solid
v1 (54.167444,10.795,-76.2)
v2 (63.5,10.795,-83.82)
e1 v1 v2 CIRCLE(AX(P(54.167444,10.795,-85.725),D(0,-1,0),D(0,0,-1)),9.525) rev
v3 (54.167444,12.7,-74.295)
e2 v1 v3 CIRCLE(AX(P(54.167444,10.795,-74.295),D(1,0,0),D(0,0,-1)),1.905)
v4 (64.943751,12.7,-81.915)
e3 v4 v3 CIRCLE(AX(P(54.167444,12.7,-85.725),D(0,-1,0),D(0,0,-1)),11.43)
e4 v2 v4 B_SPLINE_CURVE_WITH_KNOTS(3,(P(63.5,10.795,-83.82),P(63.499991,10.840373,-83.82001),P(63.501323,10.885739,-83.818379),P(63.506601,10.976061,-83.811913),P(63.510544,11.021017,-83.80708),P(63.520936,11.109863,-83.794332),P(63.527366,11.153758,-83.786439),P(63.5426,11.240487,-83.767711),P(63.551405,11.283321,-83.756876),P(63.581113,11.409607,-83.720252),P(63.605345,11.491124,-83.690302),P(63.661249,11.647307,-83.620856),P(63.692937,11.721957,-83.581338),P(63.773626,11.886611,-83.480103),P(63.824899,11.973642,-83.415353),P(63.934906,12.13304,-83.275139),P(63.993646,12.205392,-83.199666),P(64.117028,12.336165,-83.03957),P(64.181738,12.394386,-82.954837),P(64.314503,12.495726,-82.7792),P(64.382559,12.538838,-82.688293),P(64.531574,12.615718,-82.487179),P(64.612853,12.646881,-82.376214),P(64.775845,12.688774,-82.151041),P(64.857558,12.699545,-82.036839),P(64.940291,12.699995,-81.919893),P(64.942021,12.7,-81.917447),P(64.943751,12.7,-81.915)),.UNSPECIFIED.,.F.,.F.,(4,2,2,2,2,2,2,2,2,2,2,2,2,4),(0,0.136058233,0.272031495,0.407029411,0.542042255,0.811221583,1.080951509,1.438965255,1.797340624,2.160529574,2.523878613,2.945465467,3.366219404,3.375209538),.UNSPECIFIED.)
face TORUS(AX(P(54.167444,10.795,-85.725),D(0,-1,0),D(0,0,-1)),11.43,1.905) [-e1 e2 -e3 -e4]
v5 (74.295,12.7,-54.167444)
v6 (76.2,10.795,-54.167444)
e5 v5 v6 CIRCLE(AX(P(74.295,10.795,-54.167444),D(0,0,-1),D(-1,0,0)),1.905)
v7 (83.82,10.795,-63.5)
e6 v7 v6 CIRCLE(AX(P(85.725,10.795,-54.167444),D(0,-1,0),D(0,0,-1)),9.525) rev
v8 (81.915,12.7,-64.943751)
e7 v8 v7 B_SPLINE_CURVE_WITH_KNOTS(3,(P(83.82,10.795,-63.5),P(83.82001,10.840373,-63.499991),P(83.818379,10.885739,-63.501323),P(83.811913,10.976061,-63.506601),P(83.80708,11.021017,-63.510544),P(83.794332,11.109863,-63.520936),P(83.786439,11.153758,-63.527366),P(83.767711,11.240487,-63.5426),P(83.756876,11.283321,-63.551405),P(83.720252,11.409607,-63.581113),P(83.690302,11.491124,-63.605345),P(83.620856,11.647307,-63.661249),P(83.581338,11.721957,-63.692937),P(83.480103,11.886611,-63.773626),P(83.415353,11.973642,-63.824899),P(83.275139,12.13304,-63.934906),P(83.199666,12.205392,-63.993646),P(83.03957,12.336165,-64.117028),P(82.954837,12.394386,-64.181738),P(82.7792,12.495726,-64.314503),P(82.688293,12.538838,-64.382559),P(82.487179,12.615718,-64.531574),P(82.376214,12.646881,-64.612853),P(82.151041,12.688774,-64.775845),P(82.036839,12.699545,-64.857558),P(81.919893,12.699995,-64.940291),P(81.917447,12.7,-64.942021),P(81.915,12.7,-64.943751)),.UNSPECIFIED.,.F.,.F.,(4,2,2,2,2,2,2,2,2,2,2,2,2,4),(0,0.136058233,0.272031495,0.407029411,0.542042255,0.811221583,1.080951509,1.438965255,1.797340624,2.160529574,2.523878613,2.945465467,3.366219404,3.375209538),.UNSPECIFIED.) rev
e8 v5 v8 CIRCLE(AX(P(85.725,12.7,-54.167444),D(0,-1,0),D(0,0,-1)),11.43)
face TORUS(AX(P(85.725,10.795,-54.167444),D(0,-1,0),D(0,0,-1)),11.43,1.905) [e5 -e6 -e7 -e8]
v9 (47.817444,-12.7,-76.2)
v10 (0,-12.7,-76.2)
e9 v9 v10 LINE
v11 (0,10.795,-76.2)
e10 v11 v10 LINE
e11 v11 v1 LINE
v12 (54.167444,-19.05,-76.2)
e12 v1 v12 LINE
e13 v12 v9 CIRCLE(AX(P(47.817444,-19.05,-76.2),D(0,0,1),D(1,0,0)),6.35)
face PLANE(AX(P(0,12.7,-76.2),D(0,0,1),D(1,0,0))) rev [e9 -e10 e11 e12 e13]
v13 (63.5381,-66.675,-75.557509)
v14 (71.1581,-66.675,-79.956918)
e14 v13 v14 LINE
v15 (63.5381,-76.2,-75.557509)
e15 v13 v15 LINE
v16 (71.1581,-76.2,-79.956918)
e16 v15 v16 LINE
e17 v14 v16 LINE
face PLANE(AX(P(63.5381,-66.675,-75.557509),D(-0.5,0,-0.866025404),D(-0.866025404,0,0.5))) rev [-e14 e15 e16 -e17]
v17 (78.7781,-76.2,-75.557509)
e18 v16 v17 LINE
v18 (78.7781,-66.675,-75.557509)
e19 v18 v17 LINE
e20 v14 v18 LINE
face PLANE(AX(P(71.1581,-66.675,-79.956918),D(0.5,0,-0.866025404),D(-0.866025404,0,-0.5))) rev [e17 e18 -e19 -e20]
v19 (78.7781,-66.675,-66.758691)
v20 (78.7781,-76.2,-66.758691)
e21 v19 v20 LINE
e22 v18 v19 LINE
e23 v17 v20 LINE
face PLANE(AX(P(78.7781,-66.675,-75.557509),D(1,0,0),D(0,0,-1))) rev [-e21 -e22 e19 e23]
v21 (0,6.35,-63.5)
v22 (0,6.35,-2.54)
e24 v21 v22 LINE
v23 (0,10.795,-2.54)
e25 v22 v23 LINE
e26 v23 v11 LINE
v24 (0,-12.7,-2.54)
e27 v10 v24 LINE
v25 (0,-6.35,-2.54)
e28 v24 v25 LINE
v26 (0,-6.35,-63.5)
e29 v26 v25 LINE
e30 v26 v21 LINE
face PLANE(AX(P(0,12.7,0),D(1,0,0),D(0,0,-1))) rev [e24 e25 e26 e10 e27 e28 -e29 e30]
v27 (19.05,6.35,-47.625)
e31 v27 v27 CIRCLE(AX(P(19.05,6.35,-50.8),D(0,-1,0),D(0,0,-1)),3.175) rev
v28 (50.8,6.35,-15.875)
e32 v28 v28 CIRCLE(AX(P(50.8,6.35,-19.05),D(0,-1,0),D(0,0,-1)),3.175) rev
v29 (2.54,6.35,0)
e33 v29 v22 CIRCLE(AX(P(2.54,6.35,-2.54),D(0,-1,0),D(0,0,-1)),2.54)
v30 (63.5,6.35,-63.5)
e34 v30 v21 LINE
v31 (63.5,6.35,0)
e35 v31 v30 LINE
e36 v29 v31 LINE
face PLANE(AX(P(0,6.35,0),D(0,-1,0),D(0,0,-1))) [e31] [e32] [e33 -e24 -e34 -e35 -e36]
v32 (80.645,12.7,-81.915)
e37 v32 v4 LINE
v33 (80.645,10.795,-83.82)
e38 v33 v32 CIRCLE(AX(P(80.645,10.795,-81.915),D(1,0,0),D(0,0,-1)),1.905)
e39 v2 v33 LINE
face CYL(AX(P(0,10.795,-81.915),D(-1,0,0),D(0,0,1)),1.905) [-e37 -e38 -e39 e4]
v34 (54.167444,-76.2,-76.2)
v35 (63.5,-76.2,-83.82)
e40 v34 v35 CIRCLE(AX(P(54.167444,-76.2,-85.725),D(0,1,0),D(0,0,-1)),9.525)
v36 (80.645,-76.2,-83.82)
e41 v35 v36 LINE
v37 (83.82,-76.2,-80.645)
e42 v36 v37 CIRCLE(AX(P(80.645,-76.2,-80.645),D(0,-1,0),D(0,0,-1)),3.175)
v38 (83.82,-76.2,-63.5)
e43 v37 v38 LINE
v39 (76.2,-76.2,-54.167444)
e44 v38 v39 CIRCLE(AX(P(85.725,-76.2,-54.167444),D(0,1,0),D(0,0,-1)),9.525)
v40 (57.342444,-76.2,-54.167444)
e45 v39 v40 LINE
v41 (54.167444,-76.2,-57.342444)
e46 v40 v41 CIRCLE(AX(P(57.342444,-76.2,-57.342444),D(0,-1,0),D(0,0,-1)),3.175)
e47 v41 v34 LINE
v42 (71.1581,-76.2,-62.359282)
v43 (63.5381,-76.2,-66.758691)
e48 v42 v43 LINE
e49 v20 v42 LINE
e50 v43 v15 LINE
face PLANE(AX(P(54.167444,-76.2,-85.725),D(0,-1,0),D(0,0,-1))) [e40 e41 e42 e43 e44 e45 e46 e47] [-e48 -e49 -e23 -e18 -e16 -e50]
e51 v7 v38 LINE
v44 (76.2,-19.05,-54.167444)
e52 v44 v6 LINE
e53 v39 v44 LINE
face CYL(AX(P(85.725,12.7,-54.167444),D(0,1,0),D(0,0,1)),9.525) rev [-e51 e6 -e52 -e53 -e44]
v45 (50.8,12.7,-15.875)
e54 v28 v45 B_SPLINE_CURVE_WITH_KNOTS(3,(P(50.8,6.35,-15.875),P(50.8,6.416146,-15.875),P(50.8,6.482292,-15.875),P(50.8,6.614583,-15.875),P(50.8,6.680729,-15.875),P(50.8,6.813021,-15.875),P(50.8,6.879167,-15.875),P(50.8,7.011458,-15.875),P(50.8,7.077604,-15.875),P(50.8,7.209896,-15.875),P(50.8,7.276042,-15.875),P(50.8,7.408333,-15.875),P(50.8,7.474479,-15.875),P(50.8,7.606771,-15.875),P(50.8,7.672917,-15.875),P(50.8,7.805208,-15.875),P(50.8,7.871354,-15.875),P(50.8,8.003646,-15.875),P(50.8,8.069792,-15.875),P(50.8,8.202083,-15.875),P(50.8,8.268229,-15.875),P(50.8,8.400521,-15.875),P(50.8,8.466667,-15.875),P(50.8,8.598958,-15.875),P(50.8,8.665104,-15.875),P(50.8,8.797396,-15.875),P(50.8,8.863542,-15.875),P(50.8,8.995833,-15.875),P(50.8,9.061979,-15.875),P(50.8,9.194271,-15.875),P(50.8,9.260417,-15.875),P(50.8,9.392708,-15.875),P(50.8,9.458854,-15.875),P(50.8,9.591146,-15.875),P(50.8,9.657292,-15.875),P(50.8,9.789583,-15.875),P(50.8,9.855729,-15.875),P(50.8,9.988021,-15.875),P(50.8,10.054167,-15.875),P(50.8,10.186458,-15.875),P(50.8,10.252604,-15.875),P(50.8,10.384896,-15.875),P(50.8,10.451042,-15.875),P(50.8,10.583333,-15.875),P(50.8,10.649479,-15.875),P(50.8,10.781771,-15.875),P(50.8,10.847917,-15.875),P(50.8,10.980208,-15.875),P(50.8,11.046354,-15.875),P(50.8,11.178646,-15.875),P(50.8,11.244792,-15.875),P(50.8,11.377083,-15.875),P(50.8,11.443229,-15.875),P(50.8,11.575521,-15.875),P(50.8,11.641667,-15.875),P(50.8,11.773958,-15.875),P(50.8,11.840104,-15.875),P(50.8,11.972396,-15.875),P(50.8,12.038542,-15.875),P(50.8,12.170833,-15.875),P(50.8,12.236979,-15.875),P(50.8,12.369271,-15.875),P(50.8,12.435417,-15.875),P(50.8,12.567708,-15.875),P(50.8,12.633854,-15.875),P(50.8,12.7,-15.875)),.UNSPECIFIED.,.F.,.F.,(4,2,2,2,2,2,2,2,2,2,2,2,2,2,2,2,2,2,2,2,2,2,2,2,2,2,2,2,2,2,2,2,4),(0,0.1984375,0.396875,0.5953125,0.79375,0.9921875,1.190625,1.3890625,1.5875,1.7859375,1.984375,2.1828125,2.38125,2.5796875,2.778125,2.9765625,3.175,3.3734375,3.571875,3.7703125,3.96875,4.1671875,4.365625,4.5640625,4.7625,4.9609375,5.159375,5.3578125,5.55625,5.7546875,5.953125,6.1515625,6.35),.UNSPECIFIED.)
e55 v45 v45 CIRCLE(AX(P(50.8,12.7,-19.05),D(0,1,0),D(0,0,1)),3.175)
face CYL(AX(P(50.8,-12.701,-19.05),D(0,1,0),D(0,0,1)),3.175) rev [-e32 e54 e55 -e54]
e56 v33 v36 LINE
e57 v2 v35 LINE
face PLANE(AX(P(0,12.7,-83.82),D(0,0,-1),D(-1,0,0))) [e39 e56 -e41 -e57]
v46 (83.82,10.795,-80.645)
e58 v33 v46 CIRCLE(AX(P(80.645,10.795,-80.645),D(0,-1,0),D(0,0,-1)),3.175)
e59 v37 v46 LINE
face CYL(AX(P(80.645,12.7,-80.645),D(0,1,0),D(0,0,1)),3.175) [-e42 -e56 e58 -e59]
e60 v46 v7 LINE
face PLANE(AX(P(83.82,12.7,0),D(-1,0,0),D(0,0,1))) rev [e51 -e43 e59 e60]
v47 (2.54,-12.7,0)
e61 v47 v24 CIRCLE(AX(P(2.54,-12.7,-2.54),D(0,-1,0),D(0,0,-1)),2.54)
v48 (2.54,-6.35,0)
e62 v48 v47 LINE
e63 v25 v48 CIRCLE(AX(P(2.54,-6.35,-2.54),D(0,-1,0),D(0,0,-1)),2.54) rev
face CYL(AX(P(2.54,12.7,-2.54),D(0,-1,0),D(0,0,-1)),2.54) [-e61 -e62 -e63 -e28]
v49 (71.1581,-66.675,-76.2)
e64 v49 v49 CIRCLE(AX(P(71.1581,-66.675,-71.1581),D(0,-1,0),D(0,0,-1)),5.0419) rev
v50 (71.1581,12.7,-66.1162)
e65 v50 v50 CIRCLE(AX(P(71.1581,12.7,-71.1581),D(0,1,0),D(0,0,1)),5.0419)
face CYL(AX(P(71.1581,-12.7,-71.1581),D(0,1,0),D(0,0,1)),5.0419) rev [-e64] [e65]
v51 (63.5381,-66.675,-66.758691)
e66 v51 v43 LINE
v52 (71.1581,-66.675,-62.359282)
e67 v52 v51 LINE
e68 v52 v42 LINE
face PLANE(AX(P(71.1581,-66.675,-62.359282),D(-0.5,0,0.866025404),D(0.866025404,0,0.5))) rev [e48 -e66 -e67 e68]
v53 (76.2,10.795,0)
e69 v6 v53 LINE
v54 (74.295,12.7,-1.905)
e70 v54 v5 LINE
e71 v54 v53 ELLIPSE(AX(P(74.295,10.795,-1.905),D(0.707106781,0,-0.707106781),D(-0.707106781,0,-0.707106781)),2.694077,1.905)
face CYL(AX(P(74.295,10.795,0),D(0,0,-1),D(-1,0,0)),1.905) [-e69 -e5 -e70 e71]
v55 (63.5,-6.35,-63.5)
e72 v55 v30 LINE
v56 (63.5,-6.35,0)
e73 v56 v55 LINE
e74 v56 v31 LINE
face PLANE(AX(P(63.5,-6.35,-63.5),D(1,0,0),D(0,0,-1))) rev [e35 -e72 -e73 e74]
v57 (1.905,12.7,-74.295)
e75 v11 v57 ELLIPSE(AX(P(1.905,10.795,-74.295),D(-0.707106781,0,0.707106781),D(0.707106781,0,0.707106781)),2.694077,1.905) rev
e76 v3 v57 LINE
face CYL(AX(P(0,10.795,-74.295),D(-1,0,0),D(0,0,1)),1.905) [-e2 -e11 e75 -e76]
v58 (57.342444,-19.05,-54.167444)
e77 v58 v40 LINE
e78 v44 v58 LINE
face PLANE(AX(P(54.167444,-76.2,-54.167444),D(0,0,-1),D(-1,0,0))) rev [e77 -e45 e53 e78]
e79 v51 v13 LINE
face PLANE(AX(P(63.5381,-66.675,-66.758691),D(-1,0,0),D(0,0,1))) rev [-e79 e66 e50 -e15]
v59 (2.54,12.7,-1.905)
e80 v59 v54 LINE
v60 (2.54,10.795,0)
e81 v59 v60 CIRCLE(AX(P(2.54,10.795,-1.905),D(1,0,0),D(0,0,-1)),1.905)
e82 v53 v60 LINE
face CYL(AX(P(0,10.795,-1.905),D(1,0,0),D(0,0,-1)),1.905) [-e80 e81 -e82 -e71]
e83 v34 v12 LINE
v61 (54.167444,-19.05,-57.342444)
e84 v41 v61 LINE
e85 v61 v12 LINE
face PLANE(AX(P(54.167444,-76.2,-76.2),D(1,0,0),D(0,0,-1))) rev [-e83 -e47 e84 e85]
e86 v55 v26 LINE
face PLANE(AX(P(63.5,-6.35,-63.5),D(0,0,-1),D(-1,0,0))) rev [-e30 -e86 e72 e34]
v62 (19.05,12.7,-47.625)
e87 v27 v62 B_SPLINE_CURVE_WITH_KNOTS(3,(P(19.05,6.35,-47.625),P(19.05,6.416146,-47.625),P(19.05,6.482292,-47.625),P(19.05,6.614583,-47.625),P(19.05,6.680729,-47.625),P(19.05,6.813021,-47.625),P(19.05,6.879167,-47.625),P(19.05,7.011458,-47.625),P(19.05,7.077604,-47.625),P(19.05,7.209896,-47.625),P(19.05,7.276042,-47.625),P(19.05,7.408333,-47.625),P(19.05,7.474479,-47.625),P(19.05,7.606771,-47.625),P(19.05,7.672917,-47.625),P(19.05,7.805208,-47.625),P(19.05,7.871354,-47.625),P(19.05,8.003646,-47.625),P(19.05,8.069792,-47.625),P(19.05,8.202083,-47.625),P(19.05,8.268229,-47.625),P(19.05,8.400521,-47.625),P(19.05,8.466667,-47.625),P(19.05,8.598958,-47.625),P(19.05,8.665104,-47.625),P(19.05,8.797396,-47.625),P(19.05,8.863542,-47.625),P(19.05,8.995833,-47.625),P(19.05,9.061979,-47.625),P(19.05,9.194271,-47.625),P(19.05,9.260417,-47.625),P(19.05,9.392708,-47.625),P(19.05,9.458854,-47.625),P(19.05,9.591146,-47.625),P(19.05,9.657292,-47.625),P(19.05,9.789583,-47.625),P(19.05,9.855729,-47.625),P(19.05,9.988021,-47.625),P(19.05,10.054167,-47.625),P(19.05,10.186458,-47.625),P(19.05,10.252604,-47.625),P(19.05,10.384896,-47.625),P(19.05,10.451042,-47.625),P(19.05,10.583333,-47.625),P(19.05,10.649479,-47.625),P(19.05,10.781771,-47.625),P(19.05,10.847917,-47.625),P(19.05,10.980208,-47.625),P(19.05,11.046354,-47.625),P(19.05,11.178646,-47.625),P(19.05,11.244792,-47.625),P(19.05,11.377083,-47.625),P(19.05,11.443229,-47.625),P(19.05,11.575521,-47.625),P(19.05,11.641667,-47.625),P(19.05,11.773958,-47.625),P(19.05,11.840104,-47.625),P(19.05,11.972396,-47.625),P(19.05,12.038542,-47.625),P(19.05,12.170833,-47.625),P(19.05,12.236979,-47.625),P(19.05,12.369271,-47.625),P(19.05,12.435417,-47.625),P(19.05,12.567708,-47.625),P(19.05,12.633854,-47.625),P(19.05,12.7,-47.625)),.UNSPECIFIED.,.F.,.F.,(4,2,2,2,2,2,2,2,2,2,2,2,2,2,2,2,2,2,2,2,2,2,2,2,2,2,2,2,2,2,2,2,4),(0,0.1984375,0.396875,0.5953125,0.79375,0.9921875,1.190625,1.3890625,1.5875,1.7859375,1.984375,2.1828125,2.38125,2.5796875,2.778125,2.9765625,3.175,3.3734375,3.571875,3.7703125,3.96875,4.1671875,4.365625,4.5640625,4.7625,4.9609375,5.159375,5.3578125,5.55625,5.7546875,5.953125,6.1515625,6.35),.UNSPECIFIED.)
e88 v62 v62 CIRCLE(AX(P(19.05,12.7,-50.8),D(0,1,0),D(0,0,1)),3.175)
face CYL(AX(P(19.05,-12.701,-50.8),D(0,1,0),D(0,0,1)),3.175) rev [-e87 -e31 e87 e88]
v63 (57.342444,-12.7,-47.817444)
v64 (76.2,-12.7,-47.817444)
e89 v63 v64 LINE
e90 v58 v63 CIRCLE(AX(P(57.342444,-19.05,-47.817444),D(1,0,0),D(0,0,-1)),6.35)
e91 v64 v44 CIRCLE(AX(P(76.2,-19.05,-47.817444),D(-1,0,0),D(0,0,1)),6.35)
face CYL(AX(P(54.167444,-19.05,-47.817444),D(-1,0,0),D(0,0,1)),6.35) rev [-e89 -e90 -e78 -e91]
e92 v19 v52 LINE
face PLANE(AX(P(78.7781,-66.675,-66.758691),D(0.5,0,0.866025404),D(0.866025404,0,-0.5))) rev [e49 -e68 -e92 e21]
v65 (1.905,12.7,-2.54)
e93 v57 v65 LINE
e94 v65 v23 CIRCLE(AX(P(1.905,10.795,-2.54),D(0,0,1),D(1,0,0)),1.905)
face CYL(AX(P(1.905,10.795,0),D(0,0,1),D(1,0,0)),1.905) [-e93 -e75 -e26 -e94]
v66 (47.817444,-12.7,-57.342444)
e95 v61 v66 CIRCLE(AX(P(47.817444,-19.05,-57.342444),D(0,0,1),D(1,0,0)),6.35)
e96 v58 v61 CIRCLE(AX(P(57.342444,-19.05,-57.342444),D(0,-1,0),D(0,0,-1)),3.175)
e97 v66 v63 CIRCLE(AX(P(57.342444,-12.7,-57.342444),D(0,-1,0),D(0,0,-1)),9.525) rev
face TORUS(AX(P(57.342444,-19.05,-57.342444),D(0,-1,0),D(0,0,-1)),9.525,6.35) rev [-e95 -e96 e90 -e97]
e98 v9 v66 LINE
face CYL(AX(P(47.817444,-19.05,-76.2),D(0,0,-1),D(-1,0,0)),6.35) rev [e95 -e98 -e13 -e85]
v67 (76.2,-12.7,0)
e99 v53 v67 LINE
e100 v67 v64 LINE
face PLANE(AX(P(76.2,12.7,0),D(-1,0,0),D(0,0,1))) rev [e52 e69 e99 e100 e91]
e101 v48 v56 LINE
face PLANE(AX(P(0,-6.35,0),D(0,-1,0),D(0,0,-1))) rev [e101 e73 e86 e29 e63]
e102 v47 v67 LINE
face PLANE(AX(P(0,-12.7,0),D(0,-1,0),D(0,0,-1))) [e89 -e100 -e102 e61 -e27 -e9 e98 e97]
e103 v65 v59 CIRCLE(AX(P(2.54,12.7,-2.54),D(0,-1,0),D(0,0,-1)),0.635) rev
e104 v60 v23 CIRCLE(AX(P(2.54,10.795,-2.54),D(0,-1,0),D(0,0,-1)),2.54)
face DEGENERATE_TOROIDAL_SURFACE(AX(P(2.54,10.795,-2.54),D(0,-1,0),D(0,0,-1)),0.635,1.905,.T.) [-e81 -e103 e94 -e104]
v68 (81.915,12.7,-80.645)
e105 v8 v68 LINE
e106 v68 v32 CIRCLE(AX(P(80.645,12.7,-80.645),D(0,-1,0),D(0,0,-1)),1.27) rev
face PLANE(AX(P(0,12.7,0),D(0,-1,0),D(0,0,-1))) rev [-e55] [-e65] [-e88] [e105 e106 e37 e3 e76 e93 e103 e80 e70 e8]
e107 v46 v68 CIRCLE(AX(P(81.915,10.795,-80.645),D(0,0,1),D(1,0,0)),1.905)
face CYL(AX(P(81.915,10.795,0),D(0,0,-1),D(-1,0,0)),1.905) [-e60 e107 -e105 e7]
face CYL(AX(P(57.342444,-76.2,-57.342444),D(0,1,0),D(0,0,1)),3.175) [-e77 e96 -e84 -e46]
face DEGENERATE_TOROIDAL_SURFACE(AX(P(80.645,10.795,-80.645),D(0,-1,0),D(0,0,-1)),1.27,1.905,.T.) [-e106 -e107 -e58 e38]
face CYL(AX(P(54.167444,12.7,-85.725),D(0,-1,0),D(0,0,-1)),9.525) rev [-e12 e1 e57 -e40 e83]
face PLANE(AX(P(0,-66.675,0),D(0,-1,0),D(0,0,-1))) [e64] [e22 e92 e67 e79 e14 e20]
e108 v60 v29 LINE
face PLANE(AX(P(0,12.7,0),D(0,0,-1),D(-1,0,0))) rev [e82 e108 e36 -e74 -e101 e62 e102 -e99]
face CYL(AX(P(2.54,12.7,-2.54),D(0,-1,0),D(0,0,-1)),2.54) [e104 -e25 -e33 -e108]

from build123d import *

# Parameters (mm, degrees)
SKETCH1_W               = 76.19999999999999
SKETCH1_H               = 76.2
BOSS_EXTRUDE1_DEPTH     = 12.7
CUT_EXTRUDE1_DEPTH      = 6.35
SKETCH4_W               = 20.320000000000007
SKETCH4_H               = 20.32
SKETCH4_R               = 5.041900000000002
BOSS_EXTRUDE2_DEPTH     = 12.7
CUT_EXTRUDE2_DEPTH      = 120.21776209944557
CUT_EXTRUDE2_DEPTH_BACK = 120.21776209944557
SKETCH4_3_R             = 5.041900000000002
FILLET2_R               = 9.525
FILLET3_R               = 3.175
CUT_EXTRUDE3_REACH      = 123.23
SKETCH5_R               = 3.174999999999997
SKETCH5_R_2             = 3.174999999999998
SKETCH6_R               = 5.041900000000002
BOSS_EXTRUDE3_DEPTH     = 63.5
CUT_EXTRUDE4_DEPTH      = 9.525
FILLET4_R               = 3.175
FILLET5_R               = 6.35
FILLET6_R               = 2.54
FILLET7_R               = 1.9049999999999998


with BuildPart() as part:
    # Sketch1 → Boss-Extrude1 (new, symmetric)
    with BuildSketch(Plane(origin=(0, 0, 0), x_dir=(1, 0, 0), z_dir=(0, 1, 0))):
        with Locations((38.099999999999994, 38.1)):
            Rectangle(SKETCH1_W, SKETCH1_H)
    extrude(amount=BOSS_EXTRUDE1_DEPTH, both=True)

    # Sketch3 → Cut-Extrude1 (cut, symmetric)
    with BuildSketch(Plane(origin=(0, 0, 0), x_dir=(1, 0, 0), z_dir=(0, 1, 0))):
        Polygon((63.499999999999986, 63.5), (-2.082e-14, 63.5), (0, 0), (63.5, 1.7e-16), align=None)
    extrude(amount=CUT_EXTRUDE1_DEPTH, both=True, mode=Mode.SUBTRACT)

    # Sketch4 → Boss-Extrude2 (add, symmetric)
    with BuildSketch(Plane(origin=(0, 0, 0), x_dir=(1, 0, 0), z_dir=(0, 1, 0))):
        with Locations((73.66, 73.66000000000001)):
            Rectangle(SKETCH4_W, SKETCH4_H)
        with Locations((71.15809999999999, 71.1581)):
            Circle(SKETCH4_R, mode=Mode.SUBTRACT)
    extrude(amount=BOSS_EXTRUDE2_DEPTH, both=True)

    # Sketch4<3> → Cut-Extrude2 (cut, two sides: drawn at the far end of the back side and taken through both)
    with BuildSketch(Plane(origin=(0, 0, 0), x_dir=(1, 0, 0), z_dir=(0, 1, 0)).offset(-CUT_EXTRUDE2_DEPTH_BACK)):
        with Locations(Location((71.15809999999999, 71.1581, 0), (0, 0, 270))):
            Circle(SKETCH4_3_R)
    extrude(amount=CUT_EXTRUDE2_DEPTH + CUT_EXTRUDE2_DEPTH_BACK, mode=Mode.SUBTRACT)

    # Fillet2
    # the kernel refuses this fillet: 9.525 mm, written as the material it adds along each edge
    with BuildSketch(Plane(origin=(63.499999999999986, -12.7, -76.2), x_dir=(-1, 0, 0), z_dir=(0, 1, 0))) as fillet2_piece_1:
        with BuildLine():
            CenterArc((9.332555920003912, -9.525000000000006), FILLET2_R, 90, 78.4630409671845)
            Line((0, -7.6200000000000045), (-0.18665111840007853, -7.5819000000000045))
            ThreePointArc((-0.18665111840007853, -7.5819000000000045), (-0.1905000000000001, -3.8100000000000023), (-0.1905000000000001, 0))
            Line((-0.1905000000000001, 0), (0, 0.1905000000000001))
            Line((0, 0.1905000000000001), (9.332555920003912, 0.1905000000000001))
            Line((9.332555920003912, 0.1905000000000001), (9.332555920003912, 0))
        make_face()
    extrude(amount=25.4)
    with BuildSketch(Plane(origin=(76.19999999999999, 12.7, -63.5), x_dir=(0, 0, 1), z_dir=(0, -1, 0))) as fillet2_piece_2:
        with BuildLine():
            CenterArc((9.332555920003905, -9.525000000000006), FILLET2_R, 90, 78.4630409671845)
            Line((0, -7.6200000000000045), (-0.18665111840007853, -7.5819000000000045))
            ThreePointArc((-0.18665111840007853, -7.5819000000000045), (-0.1905000000000001, -3.8100000000000023), (-0.1905000000000001, 0))
            Line((-0.1905000000000001, 0), (0, 0.1905000000000001))
            Line((0, 0.1905000000000001), (9.332555920003905, 0.1905000000000001))
            Line((9.332555920003905, 0.1905000000000001), (9.332555920003905, 0))
        make_face()
    extrude(amount=25.4)

    # Fillet3
    fillet3_edges = [part.edges().sort_by_distance(p)[0] for p in [
        (83.82, 0, -83.82000000000001),
    ]]
    fillet(fillet3_edges, radius=FILLET3_R)

    # Sketch5 → Cut-Extrude3 (cut, up to next)
    with BuildSketch(Plane(origin=(0, 12.7, 0), x_dir=(1, 0, 0), z_dir=(0, 1, 0)), mode=Mode.PRIVATE) as cut_extrude3_sk1:
        with Locations(Location((19.050000000000004, 50.800000000000004, 0), (0, 0, 270))):
            Circle(SKETCH5_R)
    cut_extrude3_tool1 = extrude(cut_extrude3_sk1.sketch, amount=-CUT_EXTRUDE3_REACH, mode=Mode.PRIVATE) & part.part
    # Sketch5 → Cut-Extrude3 (cut, up to next)
    with BuildSketch(Plane(origin=(0, 12.7, 0), x_dir=(1, 0, 0), z_dir=(0, 1, 0)), mode=Mode.PRIVATE) as cut_extrude3_sk2:
        with Locations(Location((50.79999999999999, 19.05, 0), (0, 0, 270))):
            Circle(SKETCH5_R_2)
    cut_extrude3_tool2 = extrude(cut_extrude3_sk2.sketch, amount=-CUT_EXTRUDE3_REACH, mode=Mode.PRIVATE) & part.part
    add(cut_extrude3_tool1.solids().sort_by_distance((19.05, 12.7, -50.8))[0], mode=Mode.SUBTRACT)
    add(cut_extrude3_tool2.solids().sort_by_distance((50.8, 12.7, -19.05))[0], mode=Mode.SUBTRACT)

    # Sketch6 → Boss-Extrude3 (add)
    with BuildSketch(Plane.XZ.offset(12.7)):
        with BuildLine():
            Line((54.16744407999608, -76.2), (54.16744407999608, -54.16744407999608))
            Line((54.16744407999608, -54.16744407999608), (76.19999999999999, -54.16744407999608))
            ThreePointArc((76.19999999999999, -54.16744407999608), (78.34696672547486, -60.191583022616854), (83.82, -63.5))
            Line((83.82, -63.5), (83.82, -80.64500000000001))
            ThreePointArc((83.82, -80.64500000000001), (82.89006403026728, -82.8900640302673), (80.645, -83.82000000000001))
            Line((80.645, -83.82000000000001), (63.499999999999986, -83.82000000000001))
            ThreePointArc((63.499999999999986, -83.82000000000001), (60.19158302261684, -78.34696672547489), (54.16744407999608, -76.2))
        make_face()
        with Locations(Location((71.15809999999999, -71.1581, 0), (0, 0, 90))):
            Circle(SKETCH6_R, mode=Mode.SUBTRACT)
    extrude(amount=BOSS_EXTRUDE3_DEPTH)

    # Sketch7 → Cut-Extrude4 (cut)
    with BuildSketch(Plane.XZ.offset(76.2)):
        Polygon((71.15809999999995, -79.9569181024499), (78.77809999999995, -75.55750905122497), (78.77809999999997, -66.75869094877508), (71.15809999999996, -62.359281897550105), (63.53809999999996, -66.75869094877504), (63.53809999999996, -75.55750905122494), align=None)
    extrude(amount=-CUT_EXTRUDE4_DEPTH, mode=Mode.SUBTRACT)

    # Fillet4
    fillet4_edges = [part.edges().sort_by_distance(p)[0] for p in [
        (54.16744407999608, -44.45, -54.16744407999608),
    ]]
    fillet(fillet4_edges, radius=FILLET4_R)

    # Fillet5
    fillet5_edges = [part.edges().sort_by_distance(p)[0] for p in [
        (66.77122203999804, -12.7, -54.16744407999608),
        (54.16744407999608, -12.7, -66.77122203999804),
        (55.09738004972879, -12.7, -55.09738004972879),
    ]]
    fillet(fillet5_edges, radius=FILLET5_R)

    # Fillet6
    fillet6_edges = [part.edges().sort_by_distance(p)[0] for p in [
        (0, -9.524999999999999, 0),
        (0, 9.524999999999999, 0),
    ]]
    fillet(fillet6_edges, radius=FILLET6_R)

    # Fillet7
    fillet7_edges = [part.edges().sort_by_distance(p)[0] for p in [
        (76.19999999999999, 12.7, -27.083722039998),
        (39.36999999999999, 12.7, 0),
        (0.7439487757861678, 12.7, -0.7439487757861698),
        (83.82, 12.7, -72.0725),
        (72.07249999999999, 12.7, -83.82000000000001),
        (0, 12.7, -39.370000000000005),
        (27.083722039998, 12.7, -76.2),
        (60.191583022616726, 12.7, -78.34696672547484),
        (78.34696672547484, 12.7, -60.191583022616726),
        (82.89006403026728, 12.7, -82.8900640302673),
    ]]
    fillet(fillet7_edges, radius=FILLET7_R)


solid = part.part
